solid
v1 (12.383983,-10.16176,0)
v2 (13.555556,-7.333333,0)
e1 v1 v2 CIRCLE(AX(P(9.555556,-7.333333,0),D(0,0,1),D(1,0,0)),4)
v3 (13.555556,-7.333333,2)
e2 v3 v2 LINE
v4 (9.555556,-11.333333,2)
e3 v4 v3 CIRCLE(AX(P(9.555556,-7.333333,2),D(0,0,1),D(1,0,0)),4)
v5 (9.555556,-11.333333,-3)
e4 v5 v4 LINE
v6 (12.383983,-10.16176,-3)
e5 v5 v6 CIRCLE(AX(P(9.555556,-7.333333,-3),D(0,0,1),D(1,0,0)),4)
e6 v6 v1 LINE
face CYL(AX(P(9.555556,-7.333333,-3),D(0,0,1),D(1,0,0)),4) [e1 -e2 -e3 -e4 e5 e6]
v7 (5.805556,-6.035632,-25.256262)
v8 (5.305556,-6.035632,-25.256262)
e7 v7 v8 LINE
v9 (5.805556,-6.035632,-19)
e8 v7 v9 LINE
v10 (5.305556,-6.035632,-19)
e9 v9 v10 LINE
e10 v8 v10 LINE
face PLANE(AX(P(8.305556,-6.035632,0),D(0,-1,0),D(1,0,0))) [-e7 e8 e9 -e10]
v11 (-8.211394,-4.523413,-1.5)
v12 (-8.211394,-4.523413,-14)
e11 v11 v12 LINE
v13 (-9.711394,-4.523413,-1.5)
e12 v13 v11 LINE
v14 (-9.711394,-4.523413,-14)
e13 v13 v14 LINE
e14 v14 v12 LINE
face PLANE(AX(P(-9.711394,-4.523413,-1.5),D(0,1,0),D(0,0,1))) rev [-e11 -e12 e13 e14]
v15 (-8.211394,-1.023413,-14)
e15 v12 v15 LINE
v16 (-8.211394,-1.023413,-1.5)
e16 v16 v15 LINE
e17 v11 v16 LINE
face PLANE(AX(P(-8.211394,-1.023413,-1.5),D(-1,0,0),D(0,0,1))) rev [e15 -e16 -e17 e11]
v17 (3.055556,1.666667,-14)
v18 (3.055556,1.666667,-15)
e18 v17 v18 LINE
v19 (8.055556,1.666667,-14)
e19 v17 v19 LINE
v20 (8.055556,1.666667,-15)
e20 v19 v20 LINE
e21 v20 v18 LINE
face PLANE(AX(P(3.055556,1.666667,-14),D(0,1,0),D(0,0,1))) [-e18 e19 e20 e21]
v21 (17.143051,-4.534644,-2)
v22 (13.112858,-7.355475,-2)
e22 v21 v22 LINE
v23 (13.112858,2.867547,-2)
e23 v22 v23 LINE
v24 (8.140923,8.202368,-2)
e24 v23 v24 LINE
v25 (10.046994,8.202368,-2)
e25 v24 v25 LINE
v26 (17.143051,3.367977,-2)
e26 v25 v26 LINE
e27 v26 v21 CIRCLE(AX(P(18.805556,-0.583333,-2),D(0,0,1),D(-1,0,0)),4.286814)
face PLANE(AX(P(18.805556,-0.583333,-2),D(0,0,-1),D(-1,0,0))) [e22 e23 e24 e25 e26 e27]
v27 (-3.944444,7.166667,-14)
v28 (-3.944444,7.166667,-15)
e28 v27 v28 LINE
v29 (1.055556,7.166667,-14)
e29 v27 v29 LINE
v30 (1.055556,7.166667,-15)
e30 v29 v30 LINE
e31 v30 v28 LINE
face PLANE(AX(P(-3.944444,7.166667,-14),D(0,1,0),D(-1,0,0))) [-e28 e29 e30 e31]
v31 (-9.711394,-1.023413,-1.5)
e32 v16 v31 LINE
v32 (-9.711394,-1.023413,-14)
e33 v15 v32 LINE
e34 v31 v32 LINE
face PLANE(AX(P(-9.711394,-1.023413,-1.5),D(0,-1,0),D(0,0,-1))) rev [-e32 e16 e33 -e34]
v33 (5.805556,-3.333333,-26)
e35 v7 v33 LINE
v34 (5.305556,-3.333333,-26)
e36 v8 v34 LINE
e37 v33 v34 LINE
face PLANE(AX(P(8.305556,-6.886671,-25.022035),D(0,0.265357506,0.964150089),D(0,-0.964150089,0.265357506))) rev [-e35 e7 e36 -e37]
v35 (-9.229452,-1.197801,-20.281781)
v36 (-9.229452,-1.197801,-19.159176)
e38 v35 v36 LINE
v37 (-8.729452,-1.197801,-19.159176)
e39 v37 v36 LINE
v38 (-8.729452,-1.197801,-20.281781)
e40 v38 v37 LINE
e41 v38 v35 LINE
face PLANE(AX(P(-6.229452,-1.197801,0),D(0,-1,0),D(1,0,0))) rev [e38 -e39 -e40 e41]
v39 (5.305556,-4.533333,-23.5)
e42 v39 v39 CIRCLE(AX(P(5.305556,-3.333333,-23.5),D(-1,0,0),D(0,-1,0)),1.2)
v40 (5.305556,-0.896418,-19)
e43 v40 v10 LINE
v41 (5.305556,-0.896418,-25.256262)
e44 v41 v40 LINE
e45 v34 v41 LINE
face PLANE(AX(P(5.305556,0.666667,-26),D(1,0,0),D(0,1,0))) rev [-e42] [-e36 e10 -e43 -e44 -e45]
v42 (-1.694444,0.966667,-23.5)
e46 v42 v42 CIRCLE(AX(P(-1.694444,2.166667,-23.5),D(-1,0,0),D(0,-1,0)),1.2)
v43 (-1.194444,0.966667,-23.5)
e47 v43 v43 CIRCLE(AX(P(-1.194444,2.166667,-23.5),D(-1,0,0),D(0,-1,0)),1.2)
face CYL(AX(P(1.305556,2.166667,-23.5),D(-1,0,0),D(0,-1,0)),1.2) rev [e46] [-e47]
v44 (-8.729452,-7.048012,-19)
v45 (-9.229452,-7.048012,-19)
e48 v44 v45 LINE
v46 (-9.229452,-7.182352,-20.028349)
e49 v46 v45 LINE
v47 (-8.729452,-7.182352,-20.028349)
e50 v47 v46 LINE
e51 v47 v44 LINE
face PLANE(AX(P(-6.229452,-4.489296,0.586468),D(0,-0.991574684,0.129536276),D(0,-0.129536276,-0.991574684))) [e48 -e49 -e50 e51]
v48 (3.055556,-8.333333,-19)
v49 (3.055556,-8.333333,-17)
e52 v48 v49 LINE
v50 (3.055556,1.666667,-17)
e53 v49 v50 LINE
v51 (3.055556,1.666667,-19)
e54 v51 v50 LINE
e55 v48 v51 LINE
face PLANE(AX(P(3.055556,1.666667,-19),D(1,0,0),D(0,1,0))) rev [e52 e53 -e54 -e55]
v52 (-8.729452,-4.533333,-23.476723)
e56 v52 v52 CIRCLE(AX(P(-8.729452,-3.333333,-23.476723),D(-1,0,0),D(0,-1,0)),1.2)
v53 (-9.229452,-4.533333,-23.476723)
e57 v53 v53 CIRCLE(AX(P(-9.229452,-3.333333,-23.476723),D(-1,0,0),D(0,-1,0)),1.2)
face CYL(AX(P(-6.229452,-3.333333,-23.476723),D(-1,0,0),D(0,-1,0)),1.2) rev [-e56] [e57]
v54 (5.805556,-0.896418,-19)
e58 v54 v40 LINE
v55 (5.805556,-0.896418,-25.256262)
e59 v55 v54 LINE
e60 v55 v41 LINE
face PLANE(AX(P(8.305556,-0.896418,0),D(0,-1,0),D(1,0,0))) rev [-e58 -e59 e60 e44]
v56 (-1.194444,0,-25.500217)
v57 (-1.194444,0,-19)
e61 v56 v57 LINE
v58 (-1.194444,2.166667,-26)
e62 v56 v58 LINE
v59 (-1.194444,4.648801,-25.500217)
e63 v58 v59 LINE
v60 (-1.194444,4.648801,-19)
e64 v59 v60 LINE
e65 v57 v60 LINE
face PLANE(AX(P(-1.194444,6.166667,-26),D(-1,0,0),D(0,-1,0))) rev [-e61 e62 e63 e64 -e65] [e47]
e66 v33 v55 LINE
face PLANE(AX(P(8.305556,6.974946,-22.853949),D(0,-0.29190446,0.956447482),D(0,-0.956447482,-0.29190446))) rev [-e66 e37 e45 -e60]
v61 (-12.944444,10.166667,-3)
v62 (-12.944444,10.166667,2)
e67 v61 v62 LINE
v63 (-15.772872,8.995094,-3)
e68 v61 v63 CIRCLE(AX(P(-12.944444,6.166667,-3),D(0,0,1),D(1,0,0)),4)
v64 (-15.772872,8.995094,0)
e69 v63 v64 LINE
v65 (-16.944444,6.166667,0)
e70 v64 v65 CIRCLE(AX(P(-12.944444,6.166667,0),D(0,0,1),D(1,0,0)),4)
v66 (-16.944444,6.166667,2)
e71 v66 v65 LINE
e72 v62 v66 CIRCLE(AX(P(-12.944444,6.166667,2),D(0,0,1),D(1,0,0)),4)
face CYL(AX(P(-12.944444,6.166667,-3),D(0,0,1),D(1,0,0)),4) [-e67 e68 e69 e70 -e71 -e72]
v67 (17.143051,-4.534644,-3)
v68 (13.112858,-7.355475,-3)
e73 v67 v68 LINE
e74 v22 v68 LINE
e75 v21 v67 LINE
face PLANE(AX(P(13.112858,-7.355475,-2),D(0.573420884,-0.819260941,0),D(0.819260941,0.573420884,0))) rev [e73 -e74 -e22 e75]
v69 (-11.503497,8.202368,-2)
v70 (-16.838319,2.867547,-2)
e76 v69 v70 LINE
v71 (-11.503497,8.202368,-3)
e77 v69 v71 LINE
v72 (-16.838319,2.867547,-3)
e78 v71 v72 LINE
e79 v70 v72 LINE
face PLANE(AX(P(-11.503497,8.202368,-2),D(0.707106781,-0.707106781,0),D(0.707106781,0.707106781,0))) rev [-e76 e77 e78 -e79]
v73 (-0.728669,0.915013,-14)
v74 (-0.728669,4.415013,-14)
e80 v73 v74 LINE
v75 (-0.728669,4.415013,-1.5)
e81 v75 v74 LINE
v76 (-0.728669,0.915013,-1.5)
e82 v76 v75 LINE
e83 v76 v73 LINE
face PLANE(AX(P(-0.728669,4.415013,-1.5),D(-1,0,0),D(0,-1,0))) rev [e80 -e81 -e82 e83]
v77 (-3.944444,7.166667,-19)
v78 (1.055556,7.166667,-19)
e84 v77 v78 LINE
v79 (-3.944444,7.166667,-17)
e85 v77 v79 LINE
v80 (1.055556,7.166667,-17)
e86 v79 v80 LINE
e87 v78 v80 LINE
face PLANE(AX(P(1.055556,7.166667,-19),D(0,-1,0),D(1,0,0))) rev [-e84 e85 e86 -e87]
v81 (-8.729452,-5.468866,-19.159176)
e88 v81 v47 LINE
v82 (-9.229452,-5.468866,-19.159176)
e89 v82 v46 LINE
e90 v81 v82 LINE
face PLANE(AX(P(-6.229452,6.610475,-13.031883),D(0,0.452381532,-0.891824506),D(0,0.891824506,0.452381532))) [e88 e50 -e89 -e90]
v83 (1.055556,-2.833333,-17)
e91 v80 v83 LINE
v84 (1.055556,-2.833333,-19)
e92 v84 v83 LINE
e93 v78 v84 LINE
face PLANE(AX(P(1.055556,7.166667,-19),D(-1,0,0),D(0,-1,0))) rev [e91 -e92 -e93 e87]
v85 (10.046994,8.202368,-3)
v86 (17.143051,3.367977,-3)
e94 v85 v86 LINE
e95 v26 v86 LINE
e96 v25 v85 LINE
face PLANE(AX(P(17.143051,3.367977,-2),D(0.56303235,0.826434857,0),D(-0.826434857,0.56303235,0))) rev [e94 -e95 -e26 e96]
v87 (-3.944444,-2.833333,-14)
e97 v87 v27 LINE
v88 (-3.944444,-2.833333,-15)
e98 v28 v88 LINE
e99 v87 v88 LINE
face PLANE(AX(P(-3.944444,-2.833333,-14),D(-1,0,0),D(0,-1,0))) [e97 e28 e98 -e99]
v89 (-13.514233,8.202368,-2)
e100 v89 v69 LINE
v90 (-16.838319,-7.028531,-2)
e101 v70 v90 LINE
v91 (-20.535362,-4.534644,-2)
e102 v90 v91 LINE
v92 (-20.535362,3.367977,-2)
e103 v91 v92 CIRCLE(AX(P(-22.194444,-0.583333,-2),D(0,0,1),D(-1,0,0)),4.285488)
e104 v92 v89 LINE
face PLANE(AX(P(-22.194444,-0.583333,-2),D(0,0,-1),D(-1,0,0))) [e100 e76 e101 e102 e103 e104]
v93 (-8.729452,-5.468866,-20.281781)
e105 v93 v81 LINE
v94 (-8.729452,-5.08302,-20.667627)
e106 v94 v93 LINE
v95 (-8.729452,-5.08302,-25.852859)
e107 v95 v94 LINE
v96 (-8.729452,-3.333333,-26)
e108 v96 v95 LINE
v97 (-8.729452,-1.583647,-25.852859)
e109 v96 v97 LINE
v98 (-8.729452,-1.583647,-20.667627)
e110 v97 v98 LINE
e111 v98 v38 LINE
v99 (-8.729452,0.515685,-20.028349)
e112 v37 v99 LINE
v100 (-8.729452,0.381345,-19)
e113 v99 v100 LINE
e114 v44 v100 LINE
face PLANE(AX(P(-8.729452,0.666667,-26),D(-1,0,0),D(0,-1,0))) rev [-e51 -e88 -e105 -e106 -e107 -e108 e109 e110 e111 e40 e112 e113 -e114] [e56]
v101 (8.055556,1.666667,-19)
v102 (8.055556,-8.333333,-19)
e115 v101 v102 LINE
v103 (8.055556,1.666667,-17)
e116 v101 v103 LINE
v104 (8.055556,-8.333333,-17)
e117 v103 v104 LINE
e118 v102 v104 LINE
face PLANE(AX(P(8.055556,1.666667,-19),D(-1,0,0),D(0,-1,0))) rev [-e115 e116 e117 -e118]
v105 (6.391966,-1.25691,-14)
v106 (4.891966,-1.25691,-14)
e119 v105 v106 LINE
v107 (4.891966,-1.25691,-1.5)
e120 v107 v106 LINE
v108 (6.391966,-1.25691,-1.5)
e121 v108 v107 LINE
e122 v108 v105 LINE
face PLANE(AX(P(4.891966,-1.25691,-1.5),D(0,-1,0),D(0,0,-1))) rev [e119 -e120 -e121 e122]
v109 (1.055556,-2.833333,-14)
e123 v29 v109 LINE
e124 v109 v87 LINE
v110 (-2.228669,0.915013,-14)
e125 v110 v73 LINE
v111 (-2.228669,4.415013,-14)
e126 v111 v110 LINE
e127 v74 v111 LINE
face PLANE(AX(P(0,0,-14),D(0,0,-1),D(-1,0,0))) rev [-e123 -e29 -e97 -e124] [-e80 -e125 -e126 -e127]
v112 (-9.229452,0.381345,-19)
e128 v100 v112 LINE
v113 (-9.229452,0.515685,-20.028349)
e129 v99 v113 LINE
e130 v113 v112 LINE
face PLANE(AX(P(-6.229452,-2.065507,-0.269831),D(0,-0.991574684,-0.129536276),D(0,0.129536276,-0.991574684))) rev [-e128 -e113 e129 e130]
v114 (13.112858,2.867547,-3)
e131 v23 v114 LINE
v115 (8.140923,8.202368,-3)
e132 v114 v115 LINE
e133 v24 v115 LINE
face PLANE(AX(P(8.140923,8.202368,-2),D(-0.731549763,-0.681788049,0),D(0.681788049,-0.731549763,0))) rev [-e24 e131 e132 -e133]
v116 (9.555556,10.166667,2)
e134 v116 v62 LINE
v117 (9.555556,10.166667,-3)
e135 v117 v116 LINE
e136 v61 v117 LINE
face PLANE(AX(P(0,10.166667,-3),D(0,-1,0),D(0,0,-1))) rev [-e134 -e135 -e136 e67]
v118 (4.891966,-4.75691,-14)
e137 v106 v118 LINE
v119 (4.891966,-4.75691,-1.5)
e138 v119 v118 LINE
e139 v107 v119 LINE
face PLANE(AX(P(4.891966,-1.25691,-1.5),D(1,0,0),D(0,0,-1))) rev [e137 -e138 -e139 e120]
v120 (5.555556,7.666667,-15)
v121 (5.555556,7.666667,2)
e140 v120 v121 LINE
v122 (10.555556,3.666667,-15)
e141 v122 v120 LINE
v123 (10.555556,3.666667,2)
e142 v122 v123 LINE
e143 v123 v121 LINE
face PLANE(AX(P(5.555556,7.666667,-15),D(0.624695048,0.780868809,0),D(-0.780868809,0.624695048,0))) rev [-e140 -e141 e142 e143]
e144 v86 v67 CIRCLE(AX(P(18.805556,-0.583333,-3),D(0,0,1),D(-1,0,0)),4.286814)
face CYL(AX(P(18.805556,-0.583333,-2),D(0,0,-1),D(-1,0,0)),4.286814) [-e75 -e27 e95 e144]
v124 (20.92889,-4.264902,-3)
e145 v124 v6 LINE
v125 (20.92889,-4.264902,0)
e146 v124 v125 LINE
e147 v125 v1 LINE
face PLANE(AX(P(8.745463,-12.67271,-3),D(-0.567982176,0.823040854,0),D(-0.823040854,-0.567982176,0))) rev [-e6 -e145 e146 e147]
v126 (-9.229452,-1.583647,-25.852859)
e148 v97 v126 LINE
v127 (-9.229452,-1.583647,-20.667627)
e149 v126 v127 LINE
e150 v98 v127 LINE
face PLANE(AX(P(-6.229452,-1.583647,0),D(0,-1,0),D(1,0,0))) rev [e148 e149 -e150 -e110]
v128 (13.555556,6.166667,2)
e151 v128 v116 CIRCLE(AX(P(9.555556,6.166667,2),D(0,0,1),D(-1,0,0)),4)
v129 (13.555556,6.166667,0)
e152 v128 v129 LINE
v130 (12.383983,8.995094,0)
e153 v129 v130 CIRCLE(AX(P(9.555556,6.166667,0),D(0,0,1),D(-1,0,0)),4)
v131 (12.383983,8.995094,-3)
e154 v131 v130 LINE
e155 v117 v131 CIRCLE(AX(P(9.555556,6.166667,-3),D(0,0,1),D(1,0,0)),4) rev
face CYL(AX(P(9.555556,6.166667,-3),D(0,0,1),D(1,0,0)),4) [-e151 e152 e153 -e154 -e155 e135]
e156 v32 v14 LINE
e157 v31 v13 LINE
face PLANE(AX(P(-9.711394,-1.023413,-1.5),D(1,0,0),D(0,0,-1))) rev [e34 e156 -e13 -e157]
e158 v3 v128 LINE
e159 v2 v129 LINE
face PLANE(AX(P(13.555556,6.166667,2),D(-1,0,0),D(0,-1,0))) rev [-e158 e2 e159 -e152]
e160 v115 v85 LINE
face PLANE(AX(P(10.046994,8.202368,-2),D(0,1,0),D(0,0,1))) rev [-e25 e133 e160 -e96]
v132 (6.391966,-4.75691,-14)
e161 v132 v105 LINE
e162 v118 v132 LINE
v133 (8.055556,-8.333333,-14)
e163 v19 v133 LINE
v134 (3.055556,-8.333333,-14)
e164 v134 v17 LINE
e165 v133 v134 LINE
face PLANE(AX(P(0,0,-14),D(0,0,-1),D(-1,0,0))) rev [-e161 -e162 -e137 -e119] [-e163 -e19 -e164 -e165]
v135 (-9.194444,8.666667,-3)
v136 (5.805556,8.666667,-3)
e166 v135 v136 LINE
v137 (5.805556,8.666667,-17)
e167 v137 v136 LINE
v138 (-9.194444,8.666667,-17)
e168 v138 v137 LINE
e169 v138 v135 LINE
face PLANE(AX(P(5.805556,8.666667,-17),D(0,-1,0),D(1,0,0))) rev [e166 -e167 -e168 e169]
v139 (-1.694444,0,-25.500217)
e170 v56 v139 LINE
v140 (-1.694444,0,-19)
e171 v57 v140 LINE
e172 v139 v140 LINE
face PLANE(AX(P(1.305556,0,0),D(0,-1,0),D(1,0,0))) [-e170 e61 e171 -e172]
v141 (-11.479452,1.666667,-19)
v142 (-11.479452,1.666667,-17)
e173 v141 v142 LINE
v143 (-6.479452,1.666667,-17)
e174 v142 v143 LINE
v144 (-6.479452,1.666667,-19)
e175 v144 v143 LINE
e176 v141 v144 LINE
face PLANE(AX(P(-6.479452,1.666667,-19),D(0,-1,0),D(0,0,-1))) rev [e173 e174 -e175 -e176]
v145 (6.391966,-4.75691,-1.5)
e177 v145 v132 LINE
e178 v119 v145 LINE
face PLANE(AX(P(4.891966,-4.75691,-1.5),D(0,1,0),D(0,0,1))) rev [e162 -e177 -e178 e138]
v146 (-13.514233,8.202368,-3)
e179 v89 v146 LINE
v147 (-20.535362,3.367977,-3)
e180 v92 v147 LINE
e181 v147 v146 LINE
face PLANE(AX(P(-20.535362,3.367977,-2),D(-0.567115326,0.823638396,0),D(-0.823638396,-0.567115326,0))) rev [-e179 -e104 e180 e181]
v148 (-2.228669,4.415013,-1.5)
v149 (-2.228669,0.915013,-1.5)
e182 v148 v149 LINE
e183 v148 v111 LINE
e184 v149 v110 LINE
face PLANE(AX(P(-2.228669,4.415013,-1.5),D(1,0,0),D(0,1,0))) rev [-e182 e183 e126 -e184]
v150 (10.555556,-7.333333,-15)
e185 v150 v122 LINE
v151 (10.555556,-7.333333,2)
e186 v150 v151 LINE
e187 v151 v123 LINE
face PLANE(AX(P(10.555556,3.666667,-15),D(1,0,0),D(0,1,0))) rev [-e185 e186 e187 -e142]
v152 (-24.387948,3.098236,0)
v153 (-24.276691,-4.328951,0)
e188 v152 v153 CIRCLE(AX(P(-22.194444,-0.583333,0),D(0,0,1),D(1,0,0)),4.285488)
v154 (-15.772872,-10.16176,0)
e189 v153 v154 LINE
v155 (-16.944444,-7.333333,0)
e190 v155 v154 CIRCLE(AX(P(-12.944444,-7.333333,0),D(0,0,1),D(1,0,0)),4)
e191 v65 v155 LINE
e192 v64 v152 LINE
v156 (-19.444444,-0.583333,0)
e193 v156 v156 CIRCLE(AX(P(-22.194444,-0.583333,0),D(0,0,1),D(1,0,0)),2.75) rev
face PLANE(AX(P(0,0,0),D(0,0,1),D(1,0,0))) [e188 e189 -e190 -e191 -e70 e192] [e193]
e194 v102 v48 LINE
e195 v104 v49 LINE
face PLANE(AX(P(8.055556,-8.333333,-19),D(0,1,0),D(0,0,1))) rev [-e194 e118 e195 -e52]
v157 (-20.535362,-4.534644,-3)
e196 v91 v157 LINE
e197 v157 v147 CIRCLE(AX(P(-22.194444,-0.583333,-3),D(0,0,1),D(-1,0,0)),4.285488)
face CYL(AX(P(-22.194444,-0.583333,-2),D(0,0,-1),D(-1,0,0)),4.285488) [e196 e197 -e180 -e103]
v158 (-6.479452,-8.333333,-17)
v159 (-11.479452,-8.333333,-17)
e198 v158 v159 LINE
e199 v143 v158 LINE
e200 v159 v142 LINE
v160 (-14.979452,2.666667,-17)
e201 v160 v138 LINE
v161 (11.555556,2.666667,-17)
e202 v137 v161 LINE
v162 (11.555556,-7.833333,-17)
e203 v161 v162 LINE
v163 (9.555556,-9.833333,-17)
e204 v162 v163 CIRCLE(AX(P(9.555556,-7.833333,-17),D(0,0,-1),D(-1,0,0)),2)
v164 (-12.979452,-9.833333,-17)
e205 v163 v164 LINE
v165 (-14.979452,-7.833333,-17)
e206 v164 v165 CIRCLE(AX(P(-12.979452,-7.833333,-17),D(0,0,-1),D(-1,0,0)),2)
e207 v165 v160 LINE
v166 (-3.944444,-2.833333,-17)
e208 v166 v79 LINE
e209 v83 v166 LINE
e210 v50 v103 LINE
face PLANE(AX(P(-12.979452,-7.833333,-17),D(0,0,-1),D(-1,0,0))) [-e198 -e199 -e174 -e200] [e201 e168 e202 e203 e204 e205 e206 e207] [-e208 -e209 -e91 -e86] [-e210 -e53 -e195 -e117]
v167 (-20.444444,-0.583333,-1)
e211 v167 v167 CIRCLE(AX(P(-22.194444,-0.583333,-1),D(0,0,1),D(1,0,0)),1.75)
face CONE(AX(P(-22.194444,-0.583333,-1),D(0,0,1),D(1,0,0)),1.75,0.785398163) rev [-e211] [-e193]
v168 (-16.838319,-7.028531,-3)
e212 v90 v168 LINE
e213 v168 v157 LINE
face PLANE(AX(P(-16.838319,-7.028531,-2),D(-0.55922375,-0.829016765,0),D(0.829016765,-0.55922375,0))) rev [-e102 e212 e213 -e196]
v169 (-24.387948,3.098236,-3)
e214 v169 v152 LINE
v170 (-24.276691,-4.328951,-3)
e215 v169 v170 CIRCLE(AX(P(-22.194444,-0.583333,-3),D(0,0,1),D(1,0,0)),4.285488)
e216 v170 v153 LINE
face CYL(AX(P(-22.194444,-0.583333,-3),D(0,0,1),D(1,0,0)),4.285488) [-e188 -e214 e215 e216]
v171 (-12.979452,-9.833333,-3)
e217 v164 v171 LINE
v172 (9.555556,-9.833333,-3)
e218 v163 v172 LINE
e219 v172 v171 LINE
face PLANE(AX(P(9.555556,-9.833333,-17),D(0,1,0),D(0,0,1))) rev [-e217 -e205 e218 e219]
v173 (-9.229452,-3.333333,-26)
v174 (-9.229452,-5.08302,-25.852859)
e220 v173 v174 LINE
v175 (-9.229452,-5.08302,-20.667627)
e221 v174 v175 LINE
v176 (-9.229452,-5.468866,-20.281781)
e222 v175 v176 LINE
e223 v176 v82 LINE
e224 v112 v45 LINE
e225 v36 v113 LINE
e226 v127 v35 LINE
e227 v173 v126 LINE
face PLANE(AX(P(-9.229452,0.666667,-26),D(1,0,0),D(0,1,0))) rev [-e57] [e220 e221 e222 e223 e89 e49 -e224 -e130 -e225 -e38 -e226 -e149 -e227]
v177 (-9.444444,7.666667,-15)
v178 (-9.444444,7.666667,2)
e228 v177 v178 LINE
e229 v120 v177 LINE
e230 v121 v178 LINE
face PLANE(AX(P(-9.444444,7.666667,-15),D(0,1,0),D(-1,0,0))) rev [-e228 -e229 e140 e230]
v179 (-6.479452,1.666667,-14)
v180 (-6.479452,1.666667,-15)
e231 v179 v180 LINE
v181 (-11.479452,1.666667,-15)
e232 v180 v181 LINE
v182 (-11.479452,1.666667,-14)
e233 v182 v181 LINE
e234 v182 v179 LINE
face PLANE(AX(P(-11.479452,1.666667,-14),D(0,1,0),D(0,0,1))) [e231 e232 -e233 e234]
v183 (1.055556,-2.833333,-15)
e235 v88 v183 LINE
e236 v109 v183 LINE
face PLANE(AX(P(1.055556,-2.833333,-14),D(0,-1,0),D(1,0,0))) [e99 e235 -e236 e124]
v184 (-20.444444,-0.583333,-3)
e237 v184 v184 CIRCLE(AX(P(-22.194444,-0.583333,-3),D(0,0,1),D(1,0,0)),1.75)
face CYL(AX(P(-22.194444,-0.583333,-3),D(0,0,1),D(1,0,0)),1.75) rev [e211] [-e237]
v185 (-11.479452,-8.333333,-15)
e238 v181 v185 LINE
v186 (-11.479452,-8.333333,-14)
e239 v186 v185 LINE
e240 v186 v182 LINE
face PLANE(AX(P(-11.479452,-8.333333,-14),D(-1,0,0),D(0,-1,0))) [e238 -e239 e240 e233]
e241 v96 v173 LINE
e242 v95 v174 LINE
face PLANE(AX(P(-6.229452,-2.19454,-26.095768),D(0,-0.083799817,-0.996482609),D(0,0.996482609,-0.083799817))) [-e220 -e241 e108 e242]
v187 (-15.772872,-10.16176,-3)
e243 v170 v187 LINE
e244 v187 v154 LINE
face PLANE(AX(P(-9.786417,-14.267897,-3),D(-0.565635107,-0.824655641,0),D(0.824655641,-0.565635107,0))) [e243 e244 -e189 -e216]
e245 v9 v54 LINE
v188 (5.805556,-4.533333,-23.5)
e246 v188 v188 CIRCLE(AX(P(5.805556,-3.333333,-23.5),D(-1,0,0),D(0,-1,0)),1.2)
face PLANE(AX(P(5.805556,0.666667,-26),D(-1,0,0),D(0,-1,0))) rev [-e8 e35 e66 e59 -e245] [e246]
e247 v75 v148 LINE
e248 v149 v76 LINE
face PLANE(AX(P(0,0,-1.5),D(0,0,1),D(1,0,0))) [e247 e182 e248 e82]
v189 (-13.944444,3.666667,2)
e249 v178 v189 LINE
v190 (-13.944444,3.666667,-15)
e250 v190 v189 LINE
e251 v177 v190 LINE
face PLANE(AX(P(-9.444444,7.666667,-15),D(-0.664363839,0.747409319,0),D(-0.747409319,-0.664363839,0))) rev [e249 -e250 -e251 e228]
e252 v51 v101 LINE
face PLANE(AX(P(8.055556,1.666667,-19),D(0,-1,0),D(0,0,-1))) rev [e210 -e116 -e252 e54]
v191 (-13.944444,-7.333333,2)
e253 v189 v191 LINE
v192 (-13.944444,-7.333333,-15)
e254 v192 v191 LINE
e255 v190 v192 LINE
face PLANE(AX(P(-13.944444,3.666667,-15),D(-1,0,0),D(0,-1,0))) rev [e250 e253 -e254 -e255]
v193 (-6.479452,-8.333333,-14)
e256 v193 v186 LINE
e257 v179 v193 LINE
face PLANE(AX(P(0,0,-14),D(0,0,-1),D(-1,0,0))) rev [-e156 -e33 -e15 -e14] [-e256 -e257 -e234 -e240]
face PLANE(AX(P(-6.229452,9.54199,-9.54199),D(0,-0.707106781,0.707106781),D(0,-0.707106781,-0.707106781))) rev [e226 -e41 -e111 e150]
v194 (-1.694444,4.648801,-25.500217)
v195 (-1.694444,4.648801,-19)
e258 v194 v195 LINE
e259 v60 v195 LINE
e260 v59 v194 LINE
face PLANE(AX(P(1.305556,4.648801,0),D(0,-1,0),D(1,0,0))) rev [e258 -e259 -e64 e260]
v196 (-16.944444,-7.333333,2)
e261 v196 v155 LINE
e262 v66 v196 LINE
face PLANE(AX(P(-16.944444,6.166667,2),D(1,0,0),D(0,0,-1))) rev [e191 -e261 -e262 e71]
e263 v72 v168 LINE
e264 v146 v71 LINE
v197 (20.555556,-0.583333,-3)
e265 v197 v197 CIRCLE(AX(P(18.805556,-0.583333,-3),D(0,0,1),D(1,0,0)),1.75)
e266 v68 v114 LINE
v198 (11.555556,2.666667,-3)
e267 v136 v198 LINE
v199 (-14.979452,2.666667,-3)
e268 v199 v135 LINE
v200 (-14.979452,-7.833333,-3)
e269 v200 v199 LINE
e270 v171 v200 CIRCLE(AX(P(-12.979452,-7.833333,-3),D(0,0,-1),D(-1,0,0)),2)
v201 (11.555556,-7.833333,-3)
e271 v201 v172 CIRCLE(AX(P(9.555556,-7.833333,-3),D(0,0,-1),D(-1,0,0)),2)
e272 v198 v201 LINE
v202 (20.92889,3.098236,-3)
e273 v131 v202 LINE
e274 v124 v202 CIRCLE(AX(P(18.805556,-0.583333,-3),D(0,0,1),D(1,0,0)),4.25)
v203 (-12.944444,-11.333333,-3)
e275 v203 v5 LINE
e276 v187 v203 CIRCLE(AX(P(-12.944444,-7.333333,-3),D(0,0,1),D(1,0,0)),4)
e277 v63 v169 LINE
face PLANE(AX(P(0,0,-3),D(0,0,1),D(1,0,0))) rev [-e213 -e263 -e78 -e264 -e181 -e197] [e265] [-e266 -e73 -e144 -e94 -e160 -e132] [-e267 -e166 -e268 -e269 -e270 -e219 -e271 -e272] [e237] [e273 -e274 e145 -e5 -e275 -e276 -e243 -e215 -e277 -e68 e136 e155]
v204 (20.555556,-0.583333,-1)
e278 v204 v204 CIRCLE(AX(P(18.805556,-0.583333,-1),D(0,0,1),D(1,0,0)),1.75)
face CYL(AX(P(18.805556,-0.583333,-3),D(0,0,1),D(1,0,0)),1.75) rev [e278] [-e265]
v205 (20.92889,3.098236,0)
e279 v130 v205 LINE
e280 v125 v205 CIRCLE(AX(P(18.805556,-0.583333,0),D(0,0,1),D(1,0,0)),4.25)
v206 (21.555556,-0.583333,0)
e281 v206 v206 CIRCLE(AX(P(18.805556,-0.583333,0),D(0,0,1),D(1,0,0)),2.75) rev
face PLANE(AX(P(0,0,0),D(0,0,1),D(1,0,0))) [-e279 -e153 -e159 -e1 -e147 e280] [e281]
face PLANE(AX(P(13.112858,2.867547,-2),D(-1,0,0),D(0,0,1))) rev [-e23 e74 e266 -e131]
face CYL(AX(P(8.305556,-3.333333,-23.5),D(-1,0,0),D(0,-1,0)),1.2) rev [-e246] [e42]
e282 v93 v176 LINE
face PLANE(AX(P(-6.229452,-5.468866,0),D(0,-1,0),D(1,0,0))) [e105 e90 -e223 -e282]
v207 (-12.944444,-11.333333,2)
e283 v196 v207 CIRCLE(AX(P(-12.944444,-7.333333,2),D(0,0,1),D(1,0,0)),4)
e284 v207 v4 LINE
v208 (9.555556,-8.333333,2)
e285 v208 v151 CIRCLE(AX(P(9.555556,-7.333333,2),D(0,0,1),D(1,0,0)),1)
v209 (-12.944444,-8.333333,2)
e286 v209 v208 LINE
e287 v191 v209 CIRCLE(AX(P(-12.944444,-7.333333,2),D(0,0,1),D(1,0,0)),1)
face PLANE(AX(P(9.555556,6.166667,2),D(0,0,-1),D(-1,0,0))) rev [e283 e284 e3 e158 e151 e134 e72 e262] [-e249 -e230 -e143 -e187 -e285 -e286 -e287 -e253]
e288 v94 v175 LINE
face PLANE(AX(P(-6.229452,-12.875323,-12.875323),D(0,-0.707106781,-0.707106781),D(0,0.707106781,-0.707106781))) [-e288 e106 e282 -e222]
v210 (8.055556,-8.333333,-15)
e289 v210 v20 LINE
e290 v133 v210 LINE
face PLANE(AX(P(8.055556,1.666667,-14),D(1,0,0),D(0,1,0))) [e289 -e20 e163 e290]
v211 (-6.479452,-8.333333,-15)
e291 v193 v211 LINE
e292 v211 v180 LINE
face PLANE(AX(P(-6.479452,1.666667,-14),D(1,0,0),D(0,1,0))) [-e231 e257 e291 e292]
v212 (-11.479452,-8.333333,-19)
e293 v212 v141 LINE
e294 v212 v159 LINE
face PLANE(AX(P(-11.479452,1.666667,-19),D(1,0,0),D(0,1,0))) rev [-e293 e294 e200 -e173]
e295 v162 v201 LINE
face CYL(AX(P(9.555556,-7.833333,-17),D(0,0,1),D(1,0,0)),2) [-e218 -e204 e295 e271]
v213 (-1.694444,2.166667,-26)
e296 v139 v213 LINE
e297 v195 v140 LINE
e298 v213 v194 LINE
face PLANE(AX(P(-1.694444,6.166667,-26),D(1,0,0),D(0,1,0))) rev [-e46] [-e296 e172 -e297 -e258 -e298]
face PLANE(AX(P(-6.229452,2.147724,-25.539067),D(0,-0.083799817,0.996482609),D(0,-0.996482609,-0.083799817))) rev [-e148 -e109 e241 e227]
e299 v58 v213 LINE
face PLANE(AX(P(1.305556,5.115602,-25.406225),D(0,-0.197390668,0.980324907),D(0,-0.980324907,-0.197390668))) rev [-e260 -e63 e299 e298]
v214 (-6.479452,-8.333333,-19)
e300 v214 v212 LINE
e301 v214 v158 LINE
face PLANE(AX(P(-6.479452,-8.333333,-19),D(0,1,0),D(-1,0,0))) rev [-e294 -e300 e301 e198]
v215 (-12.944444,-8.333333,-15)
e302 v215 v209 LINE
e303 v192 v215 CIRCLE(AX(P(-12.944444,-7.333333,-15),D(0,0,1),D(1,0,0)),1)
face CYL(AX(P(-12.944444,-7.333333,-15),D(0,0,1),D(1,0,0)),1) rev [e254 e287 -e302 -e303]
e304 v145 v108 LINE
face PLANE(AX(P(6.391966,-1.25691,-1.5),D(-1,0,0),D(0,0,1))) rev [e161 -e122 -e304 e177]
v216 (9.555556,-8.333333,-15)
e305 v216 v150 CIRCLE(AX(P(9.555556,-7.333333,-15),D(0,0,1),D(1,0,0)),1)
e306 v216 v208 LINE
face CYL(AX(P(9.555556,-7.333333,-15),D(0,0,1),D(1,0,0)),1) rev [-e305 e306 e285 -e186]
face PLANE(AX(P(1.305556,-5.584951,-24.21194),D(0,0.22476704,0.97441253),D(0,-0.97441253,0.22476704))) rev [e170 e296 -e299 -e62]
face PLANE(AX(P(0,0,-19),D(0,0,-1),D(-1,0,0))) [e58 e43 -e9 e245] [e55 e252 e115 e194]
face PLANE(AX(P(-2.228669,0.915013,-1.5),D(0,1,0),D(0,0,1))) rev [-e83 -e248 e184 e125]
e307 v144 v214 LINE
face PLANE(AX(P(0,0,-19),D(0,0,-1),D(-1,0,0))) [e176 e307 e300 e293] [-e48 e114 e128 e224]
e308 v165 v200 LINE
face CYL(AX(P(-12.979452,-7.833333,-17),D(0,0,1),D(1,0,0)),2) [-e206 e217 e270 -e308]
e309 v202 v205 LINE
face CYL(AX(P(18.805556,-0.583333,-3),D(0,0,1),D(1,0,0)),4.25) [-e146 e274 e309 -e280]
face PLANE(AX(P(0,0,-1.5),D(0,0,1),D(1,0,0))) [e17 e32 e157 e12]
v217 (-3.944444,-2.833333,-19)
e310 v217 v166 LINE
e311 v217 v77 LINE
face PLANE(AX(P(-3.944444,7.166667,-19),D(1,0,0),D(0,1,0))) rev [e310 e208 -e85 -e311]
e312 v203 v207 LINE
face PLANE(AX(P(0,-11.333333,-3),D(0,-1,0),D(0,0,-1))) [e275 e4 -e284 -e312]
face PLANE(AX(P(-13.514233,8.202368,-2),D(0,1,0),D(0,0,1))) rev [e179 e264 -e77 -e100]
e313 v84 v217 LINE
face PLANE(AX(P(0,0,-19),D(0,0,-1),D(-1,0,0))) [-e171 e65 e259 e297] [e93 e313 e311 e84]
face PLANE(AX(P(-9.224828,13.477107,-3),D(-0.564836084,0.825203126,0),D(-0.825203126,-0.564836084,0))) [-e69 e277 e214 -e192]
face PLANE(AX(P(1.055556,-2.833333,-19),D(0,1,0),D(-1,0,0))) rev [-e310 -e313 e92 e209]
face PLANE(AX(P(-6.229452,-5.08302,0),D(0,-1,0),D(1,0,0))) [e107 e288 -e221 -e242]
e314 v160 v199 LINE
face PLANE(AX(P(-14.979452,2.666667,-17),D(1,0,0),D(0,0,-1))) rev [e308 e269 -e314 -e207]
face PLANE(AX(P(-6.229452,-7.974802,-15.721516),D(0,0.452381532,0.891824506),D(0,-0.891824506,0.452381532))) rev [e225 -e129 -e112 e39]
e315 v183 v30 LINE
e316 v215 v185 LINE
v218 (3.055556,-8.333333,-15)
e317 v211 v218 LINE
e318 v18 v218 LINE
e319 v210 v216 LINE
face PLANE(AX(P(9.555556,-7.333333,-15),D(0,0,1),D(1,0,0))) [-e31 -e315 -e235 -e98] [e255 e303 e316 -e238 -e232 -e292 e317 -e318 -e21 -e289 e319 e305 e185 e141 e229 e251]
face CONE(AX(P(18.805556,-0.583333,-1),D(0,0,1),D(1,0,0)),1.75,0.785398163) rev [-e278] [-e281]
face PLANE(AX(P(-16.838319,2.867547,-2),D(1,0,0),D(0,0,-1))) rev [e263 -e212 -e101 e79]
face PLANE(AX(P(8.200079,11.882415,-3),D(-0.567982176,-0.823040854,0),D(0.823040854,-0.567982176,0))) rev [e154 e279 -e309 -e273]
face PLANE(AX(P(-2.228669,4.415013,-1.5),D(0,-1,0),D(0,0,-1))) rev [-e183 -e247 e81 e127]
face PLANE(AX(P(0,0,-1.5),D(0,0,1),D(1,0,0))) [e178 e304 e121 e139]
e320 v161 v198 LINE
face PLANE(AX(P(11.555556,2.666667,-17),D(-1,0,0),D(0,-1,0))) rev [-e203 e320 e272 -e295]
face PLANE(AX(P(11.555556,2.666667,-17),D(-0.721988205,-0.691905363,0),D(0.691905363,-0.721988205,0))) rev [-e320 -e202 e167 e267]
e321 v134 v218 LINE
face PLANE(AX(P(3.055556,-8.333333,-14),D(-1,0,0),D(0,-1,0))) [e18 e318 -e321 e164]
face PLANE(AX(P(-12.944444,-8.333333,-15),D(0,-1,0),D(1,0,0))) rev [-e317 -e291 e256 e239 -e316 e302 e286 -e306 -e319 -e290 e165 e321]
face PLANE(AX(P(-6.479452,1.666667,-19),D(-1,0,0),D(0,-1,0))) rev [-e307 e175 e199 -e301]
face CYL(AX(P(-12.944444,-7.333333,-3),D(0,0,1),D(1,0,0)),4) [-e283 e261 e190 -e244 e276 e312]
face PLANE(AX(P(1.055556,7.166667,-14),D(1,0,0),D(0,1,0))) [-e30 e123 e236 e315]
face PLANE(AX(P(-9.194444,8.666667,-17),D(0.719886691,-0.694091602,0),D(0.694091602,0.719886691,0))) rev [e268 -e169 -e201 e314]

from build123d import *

# Parameters (mm, degrees)
SKETCH_1_R          = 1.75
EXTRUDE_1_DEPTH     = 3
EXTRUDE_START       = 2
EXTRUDE_2_DEPTH     = 2
EXTRUDE_3_DEPTH     = 14
CUT_EXTRUDE_START   = -1
CUT_EXTRUDE_1_DEPTH = 1
CHAMFER_1_SIZE      = 1
CHAMFER_2_SIZE      = 1
SKETCH_6_W          = 5
SKETCH_6_H          = 10
EXTRUDE_4_DEPTH     = 2
SKETCH_7_W          = 0.5
SKETCH_7_H          = 8
EXTRUDE_5_DEPTH     = 7
SKETCH_8_R          = 1.2
CUT_EXTRUDE_2_DEPTH = 3
SKETCH_11_R         = 1.2
CUT_EXTRUDE_3_DEPTH = 3
SKETCH_12_R         = 1.2
CUT_EXTRUDE_4_DEPTH = 3
CUT_EXTRUDE_6_DEPTH = 17
SKETCH_16_W         = 5
SKETCH_16_H         = 10
EXTRUDE_7_DEPTH     = 5
SKETCH_17_W         = 1.5
SKETCH_17_H         = 3.5
EXTRUDE_8_DEPTH     = 12.5


with BuildPart() as part:
    # Эскиз1 → Бобышка-Вытянуть1 (new body)
    with BuildSketch(Plane.XY):
        with BuildLine():
            ThreePointArc((20.928890361, -4.264902198), (23.055555556, -0.583333333), (20.928890361, 3.098235531))
            Line((20.928890361, 3.098235531), (12.38398268, 8.995093791))
            ThreePointArc((12.38398268, 8.995093791), (11.086289285, 9.862184797), (9.555555556, 10.166666667))
            Line((9.555555556, 10.166666667), (-12.944444444, 10.166666667))
            ThreePointArc((-12.944444444, 10.166666667), (-14.475178174, 9.862184797), (-15.772871569, 8.995093791))
            Line((-15.772871569, 8.995093791), (-24.387947706, 3.098235531))
            ThreePointArc((-24.387947706, 3.098235531), (-26.479451538, -0.647521096), (-24.276691296, -4.328951295))
            Line((-24.276691296, -4.328951295), (-15.772871569, -10.161760458))
            ThreePointArc((-15.772871569, -10.161760458), (-14.475178174, -11.028851463), (-12.944444444, -11.333333333))
            Line((-12.944444444, -11.333333333), (9.555555556, -11.333333333))
            ThreePointArc((9.555555556, -11.333333333), (11.086289285, -11.028851463), (12.38398268, -10.161760458))
            Line((12.38398268, -10.161760458), (20.928890361, -4.264902198))
        make_face()
        with Locations((18.805555556, -0.583333333)):
            Circle(SKETCH_1_R, mode=Mode.SUBTRACT)
        with BuildLine():
            ThreePointArc((-23.944444444, -0.583333333), (-22.194444444, 1.166666667), (-20.444444444, -0.583333333))
            ThreePointArc((-20.444444444, -0.583333333), (-22.194444444, -2.333333333), (-23.944444444, -0.583333333))
        make_face(mode=Mode.SUBTRACT)
    extrude(amount=-EXTRUDE_1_DEPTH)

    # Эскиз3 → Бобышка-Вытянуть2 (add)
    with BuildSketch(Plane.XY.offset(EXTRUDE_START)):
        with BuildLine():
            Line((-12.944444444, 10.166666667), (9.555555556, 10.166666667))
            ThreePointArc((9.555555556, 10.166666667), (12.38398268, 8.995093791), (13.555555556, 6.166666667))
            Line((13.555555556, 6.166666667), (13.555555556, -7.333333333))
            ThreePointArc((13.555555556, -7.333333333), (12.38398268, -10.161760458), (9.555555556, -11.333333333))
            Line((9.555555556, -11.333333333), (-12.944444444, -11.333333333))
            ThreePointArc((-12.944444444, -11.333333333), (-15.772871569, -10.161760458), (-16.944444444, -7.333333333))
            Line((-16.944444444, -7.333333333), (-16.944444444, 6.166666667))
            ThreePointArc((-16.944444444, 6.166666667), (-15.772871569, 8.995093791), (-12.944444444, 10.166666667))
        make_face()
    extrude(amount=-EXTRUDE_2_DEPTH)

    # Эскиз4 → Бобышка-Вытянуть3 (add)
    with BuildSketch(Plane(origin=(0, 0, -3), x_dir=(-1, 0, 0), z_dir=(0, 0, -1))):
        with BuildLine():
            Line((-5.805555556, 8.666666667), (9.194444444, 8.666666667))
            Line((9.194444444, 8.666666667), (14.979451538, 2.666666667))
            Line((14.979451538, 2.666666667), (14.979451538, -7.833333333))
            ThreePointArc((14.979451538, -7.833333333), (14.393665101, -9.247546896), (12.979451538, -9.833333333))
            Line((12.979451538, -9.833333333), (-9.555555556, -9.833333333))
            ThreePointArc((-9.555555556, -9.833333333), (-10.969769118, -9.247546896), (-11.555555556, -7.833333333))
            Line((-11.555555556, -7.833333333), (-11.555555556, 2.666666667))
            Line((-11.555555556, 2.666666667), (-5.805555556, 8.666666667))
        make_face()
    extrude(amount=EXTRUDE_3_DEPTH)

    # Эскиз5 → Вырез-Вытянуть1 (cut)
    with BuildSketch(Plane(origin=(0, 0, -3), x_dir=(-1, 0, 0), z_dir=(0, 0, -1)).offset(CUT_EXTRUDE_START)):
        with BuildLine():
            Line((-17.143050828, 3.367976899), (-10.046994094, 8.202368214))
            Line((-10.046994094, 8.202368214), (-8.140923226, 8.202368214))
            Line((-8.140923226, 8.202368214), (-13.112857934, 2.867546546))
            Line((-13.112857934, 2.867546546), (-13.112857934, -7.3554747))
            Line((-13.112857934, -7.3554747), (-17.143050828, -4.534643565))
            ThreePointArc((-17.143050828, -4.534643565), (-14.518741526, -0.583333333), (-17.143050828, 3.367976899))
        make_face()
        with BuildLine():
            Line((20.535362375, 3.367976899), (13.514232587, 8.202368214))
            Line((13.514232587, 8.202368214), (11.503497241, 8.202368214))
            Line((11.503497241, 8.202368214), (16.838318908, 2.867546546))
            Line((16.838318908, 2.867546546), (16.838318908, -7.028531022))
            Line((16.838318908, -7.028531022), (20.535362375, -4.534643565))
            ThreePointArc((20.535362375, -4.534643565), (17.908956624, -0.583333333), (20.535362375, 3.367976899))
        make_face()
    extrude(amount=CUT_EXTRUDE_1_DEPTH, mode=Mode.SUBTRACT)

    # Фаска1
    chamfer_1_edges = [part.edges().sort_by_distance(p)[0] for p in [
        (17.055555556, -0.583333333, 0),
    ]]
    chamfer(chamfer_1_edges, length=CHAMFER_1_SIZE)

    # Фаска2
    chamfer_2_edges = [part.edges().sort_by_distance(p)[0] for p in [
        (-23.944444444, -0.583333333, 0),
    ]]
    chamfer(chamfer_2_edges, length=CHAMFER_2_SIZE)

    # Эскиз6 → Бобышка-Вытянуть4 (add)
    with BuildSketch(Plane(origin=(0, 0, -17), x_dir=(-1, 0, 0), z_dir=(0, 0, -1))):
        with Locations((-5.555555556, -3.333333333)):
            Rectangle(SKETCH_6_W, SKETCH_6_H)
        with Locations((1.444444444, 2.166666667)):
            Rectangle(SKETCH_6_W, SKETCH_6_H)
        with Locations((8.979451538, -3.333333333)):
            Rectangle(SKETCH_6_W, SKETCH_6_H)
    extrude(amount=EXTRUDE_4_DEPTH)

    # Эскиз7 → Бобышка-Вытянуть5 (add, symmetric)
    with BuildSketch(Plane(origin=(0, 0, -19), x_dir=(-1, 0, 0), z_dir=(0, 0, -1))):
        with Locations((-5.555555556, -3.333333333)):
            Rectangle(SKETCH_7_W, SKETCH_7_H)
        with Locations((1.444444444, 2.166666667)):
            Rectangle(SKETCH_7_W, SKETCH_7_H)
        with Locations((8.979451538, -3.333333333)):
            Rectangle(SKETCH_7_W, SKETCH_7_H)
    extrude(amount=EXTRUDE_5_DEPTH, both=True)

    # Эскиз8 → Вырез-Вытянуть2 (cut)
    with BuildSketch(Plane.ZY.offset(9.229451538)):
        Polygon((-25.852859053, -5.08301967), (-26, -3.333333333), (-26, -7.333333333), (-19, -7.333333333), (-19, -7.048011738), (-20.028349255, -7.182352132), (-19.159176422, -5.468865668), (-20.281780656, -5.468865668), (-20.667626654, -5.08301967), align=None)
        Polygon((-26, 0.666666667), (-26, -3.333333333), (-25.852859053, -1.583646996), (-20.667626654, -1.583646996), (-20.281780656, -1.197800999), (-19.159176422, -1.197800999), (-20.028349255, 0.515685465), (-19, 0.381345072), (-19, 0.666666667), align=None)
        with Locations((-23.476723057, -3.333333333)):
            Circle(SKETCH_8_R)
    extrude(amount=-CUT_EXTRUDE_2_DEPTH, mode=Mode.SUBTRACT)

    # Эскиз11 → Вырез-Вытянуть3 (cut)
    with BuildSketch(Plane.ZY.offset(1.694444444)):
        with Locations((-23.5, 2.166666667)):
            Circle(SKETCH_11_R)
        Polygon((-19, -1.833333333), (-19, 0), (-25.500216553, 0), (-26, 2.166666667), (-26, -1.833333333), align=None)
        Polygon((-25.500216553, 4.64880104), (-19, 4.64880104), (-19, 6.166666667), (-26, 6.166666667), (-26, 2.166666667), align=None)
    extrude(amount=-CUT_EXTRUDE_3_DEPTH, mode=Mode.SUBTRACT)

    # Эскиз12 → Вырез-Вытянуть4 (cut)
    with BuildSketch(Plane.ZY.offset(-5.305555556)):
        with Locations((-23.5, -3.333333333)):
            Circle(SKETCH_12_R)
        Polygon((-19, -7.333333333), (-19, -6.035631996), (-25.256261819, -6.035631996), (-26, -3.333333333), (-26, -7.333333333), align=None)
        Polygon((-25.256261819, -0.896417806), (-19, -0.896417806), (-19, 0.666666667), (-26, 0.666666667), (-26, -3.333333333), align=None)
    extrude(amount=-CUT_EXTRUDE_4_DEPTH, mode=Mode.SUBTRACT)

    # Эскиз15 → Вырез-Вытянуть6 (cut)
    with BuildSketch(Plane.XY.offset(2)):
        with BuildLine():
            Line((-9.444444444, 7.666666667), (5.555555556, 7.666666667))
            Line((5.555555556, 7.666666667), (10.555555556, 3.666666667))
            Line((10.555555556, 3.666666667), (10.555555556, -7.333333333))
            ThreePointArc((10.555555556, -7.333333333), (10.262662337, -8.040440115), (9.555555556, -8.333333333))
            Line((9.555555556, -8.333333333), (-12.944444444, -8.333333333))
            ThreePointArc((-12.944444444, -8.333333333), (-13.651551226, -8.040440115), (-13.944444444, -7.333333333))
            Line((-13.944444444, -7.333333333), (-13.944444444, 3.666666667))
            Line((-13.944444444, 3.666666667), (-9.444444444, 7.666666667))
        make_face()
    extrude(amount=-CUT_EXTRUDE_6_DEPTH, mode=Mode.SUBTRACT)

    # Эскиз16 → Бобышка-Вытянуть7 (add)
    with BuildSketch(Plane(origin=(0, 0, -19), x_dir=(-1, 0, 0), z_dir=(0, 0, -1))):
        with Locations((8.979451538, -3.333333333)):
            Rectangle(SKETCH_16_W, SKETCH_16_H)
        with Locations((1.444444444, 2.166666667)):
            Rectangle(SKETCH_16_W, SKETCH_16_H)
        with Locations((-5.555555556, -3.333333333)):
            Rectangle(SKETCH_16_W, SKETCH_16_H)
    extrude(amount=-EXTRUDE_7_DEPTH)

    # Эскиз17 → Бобышка-Вытянуть8 (add)
    with BuildSketch(Plane.XY.offset(-14)):
        with Locations((-8.961393916, -2.773412546)):
            Rectangle(SKETCH_17_W, SKETCH_17_H)
        with Locations((-1.478668657, 2.665013022)):
            Rectangle(SKETCH_17_W, SKETCH_17_H)
        with Locations((5.641966267, -3.00690977)):
            Rectangle(SKETCH_17_W, SKETCH_17_H)
    extrude(amount=EXTRUDE_8_DEPTH)


solid = part.part
